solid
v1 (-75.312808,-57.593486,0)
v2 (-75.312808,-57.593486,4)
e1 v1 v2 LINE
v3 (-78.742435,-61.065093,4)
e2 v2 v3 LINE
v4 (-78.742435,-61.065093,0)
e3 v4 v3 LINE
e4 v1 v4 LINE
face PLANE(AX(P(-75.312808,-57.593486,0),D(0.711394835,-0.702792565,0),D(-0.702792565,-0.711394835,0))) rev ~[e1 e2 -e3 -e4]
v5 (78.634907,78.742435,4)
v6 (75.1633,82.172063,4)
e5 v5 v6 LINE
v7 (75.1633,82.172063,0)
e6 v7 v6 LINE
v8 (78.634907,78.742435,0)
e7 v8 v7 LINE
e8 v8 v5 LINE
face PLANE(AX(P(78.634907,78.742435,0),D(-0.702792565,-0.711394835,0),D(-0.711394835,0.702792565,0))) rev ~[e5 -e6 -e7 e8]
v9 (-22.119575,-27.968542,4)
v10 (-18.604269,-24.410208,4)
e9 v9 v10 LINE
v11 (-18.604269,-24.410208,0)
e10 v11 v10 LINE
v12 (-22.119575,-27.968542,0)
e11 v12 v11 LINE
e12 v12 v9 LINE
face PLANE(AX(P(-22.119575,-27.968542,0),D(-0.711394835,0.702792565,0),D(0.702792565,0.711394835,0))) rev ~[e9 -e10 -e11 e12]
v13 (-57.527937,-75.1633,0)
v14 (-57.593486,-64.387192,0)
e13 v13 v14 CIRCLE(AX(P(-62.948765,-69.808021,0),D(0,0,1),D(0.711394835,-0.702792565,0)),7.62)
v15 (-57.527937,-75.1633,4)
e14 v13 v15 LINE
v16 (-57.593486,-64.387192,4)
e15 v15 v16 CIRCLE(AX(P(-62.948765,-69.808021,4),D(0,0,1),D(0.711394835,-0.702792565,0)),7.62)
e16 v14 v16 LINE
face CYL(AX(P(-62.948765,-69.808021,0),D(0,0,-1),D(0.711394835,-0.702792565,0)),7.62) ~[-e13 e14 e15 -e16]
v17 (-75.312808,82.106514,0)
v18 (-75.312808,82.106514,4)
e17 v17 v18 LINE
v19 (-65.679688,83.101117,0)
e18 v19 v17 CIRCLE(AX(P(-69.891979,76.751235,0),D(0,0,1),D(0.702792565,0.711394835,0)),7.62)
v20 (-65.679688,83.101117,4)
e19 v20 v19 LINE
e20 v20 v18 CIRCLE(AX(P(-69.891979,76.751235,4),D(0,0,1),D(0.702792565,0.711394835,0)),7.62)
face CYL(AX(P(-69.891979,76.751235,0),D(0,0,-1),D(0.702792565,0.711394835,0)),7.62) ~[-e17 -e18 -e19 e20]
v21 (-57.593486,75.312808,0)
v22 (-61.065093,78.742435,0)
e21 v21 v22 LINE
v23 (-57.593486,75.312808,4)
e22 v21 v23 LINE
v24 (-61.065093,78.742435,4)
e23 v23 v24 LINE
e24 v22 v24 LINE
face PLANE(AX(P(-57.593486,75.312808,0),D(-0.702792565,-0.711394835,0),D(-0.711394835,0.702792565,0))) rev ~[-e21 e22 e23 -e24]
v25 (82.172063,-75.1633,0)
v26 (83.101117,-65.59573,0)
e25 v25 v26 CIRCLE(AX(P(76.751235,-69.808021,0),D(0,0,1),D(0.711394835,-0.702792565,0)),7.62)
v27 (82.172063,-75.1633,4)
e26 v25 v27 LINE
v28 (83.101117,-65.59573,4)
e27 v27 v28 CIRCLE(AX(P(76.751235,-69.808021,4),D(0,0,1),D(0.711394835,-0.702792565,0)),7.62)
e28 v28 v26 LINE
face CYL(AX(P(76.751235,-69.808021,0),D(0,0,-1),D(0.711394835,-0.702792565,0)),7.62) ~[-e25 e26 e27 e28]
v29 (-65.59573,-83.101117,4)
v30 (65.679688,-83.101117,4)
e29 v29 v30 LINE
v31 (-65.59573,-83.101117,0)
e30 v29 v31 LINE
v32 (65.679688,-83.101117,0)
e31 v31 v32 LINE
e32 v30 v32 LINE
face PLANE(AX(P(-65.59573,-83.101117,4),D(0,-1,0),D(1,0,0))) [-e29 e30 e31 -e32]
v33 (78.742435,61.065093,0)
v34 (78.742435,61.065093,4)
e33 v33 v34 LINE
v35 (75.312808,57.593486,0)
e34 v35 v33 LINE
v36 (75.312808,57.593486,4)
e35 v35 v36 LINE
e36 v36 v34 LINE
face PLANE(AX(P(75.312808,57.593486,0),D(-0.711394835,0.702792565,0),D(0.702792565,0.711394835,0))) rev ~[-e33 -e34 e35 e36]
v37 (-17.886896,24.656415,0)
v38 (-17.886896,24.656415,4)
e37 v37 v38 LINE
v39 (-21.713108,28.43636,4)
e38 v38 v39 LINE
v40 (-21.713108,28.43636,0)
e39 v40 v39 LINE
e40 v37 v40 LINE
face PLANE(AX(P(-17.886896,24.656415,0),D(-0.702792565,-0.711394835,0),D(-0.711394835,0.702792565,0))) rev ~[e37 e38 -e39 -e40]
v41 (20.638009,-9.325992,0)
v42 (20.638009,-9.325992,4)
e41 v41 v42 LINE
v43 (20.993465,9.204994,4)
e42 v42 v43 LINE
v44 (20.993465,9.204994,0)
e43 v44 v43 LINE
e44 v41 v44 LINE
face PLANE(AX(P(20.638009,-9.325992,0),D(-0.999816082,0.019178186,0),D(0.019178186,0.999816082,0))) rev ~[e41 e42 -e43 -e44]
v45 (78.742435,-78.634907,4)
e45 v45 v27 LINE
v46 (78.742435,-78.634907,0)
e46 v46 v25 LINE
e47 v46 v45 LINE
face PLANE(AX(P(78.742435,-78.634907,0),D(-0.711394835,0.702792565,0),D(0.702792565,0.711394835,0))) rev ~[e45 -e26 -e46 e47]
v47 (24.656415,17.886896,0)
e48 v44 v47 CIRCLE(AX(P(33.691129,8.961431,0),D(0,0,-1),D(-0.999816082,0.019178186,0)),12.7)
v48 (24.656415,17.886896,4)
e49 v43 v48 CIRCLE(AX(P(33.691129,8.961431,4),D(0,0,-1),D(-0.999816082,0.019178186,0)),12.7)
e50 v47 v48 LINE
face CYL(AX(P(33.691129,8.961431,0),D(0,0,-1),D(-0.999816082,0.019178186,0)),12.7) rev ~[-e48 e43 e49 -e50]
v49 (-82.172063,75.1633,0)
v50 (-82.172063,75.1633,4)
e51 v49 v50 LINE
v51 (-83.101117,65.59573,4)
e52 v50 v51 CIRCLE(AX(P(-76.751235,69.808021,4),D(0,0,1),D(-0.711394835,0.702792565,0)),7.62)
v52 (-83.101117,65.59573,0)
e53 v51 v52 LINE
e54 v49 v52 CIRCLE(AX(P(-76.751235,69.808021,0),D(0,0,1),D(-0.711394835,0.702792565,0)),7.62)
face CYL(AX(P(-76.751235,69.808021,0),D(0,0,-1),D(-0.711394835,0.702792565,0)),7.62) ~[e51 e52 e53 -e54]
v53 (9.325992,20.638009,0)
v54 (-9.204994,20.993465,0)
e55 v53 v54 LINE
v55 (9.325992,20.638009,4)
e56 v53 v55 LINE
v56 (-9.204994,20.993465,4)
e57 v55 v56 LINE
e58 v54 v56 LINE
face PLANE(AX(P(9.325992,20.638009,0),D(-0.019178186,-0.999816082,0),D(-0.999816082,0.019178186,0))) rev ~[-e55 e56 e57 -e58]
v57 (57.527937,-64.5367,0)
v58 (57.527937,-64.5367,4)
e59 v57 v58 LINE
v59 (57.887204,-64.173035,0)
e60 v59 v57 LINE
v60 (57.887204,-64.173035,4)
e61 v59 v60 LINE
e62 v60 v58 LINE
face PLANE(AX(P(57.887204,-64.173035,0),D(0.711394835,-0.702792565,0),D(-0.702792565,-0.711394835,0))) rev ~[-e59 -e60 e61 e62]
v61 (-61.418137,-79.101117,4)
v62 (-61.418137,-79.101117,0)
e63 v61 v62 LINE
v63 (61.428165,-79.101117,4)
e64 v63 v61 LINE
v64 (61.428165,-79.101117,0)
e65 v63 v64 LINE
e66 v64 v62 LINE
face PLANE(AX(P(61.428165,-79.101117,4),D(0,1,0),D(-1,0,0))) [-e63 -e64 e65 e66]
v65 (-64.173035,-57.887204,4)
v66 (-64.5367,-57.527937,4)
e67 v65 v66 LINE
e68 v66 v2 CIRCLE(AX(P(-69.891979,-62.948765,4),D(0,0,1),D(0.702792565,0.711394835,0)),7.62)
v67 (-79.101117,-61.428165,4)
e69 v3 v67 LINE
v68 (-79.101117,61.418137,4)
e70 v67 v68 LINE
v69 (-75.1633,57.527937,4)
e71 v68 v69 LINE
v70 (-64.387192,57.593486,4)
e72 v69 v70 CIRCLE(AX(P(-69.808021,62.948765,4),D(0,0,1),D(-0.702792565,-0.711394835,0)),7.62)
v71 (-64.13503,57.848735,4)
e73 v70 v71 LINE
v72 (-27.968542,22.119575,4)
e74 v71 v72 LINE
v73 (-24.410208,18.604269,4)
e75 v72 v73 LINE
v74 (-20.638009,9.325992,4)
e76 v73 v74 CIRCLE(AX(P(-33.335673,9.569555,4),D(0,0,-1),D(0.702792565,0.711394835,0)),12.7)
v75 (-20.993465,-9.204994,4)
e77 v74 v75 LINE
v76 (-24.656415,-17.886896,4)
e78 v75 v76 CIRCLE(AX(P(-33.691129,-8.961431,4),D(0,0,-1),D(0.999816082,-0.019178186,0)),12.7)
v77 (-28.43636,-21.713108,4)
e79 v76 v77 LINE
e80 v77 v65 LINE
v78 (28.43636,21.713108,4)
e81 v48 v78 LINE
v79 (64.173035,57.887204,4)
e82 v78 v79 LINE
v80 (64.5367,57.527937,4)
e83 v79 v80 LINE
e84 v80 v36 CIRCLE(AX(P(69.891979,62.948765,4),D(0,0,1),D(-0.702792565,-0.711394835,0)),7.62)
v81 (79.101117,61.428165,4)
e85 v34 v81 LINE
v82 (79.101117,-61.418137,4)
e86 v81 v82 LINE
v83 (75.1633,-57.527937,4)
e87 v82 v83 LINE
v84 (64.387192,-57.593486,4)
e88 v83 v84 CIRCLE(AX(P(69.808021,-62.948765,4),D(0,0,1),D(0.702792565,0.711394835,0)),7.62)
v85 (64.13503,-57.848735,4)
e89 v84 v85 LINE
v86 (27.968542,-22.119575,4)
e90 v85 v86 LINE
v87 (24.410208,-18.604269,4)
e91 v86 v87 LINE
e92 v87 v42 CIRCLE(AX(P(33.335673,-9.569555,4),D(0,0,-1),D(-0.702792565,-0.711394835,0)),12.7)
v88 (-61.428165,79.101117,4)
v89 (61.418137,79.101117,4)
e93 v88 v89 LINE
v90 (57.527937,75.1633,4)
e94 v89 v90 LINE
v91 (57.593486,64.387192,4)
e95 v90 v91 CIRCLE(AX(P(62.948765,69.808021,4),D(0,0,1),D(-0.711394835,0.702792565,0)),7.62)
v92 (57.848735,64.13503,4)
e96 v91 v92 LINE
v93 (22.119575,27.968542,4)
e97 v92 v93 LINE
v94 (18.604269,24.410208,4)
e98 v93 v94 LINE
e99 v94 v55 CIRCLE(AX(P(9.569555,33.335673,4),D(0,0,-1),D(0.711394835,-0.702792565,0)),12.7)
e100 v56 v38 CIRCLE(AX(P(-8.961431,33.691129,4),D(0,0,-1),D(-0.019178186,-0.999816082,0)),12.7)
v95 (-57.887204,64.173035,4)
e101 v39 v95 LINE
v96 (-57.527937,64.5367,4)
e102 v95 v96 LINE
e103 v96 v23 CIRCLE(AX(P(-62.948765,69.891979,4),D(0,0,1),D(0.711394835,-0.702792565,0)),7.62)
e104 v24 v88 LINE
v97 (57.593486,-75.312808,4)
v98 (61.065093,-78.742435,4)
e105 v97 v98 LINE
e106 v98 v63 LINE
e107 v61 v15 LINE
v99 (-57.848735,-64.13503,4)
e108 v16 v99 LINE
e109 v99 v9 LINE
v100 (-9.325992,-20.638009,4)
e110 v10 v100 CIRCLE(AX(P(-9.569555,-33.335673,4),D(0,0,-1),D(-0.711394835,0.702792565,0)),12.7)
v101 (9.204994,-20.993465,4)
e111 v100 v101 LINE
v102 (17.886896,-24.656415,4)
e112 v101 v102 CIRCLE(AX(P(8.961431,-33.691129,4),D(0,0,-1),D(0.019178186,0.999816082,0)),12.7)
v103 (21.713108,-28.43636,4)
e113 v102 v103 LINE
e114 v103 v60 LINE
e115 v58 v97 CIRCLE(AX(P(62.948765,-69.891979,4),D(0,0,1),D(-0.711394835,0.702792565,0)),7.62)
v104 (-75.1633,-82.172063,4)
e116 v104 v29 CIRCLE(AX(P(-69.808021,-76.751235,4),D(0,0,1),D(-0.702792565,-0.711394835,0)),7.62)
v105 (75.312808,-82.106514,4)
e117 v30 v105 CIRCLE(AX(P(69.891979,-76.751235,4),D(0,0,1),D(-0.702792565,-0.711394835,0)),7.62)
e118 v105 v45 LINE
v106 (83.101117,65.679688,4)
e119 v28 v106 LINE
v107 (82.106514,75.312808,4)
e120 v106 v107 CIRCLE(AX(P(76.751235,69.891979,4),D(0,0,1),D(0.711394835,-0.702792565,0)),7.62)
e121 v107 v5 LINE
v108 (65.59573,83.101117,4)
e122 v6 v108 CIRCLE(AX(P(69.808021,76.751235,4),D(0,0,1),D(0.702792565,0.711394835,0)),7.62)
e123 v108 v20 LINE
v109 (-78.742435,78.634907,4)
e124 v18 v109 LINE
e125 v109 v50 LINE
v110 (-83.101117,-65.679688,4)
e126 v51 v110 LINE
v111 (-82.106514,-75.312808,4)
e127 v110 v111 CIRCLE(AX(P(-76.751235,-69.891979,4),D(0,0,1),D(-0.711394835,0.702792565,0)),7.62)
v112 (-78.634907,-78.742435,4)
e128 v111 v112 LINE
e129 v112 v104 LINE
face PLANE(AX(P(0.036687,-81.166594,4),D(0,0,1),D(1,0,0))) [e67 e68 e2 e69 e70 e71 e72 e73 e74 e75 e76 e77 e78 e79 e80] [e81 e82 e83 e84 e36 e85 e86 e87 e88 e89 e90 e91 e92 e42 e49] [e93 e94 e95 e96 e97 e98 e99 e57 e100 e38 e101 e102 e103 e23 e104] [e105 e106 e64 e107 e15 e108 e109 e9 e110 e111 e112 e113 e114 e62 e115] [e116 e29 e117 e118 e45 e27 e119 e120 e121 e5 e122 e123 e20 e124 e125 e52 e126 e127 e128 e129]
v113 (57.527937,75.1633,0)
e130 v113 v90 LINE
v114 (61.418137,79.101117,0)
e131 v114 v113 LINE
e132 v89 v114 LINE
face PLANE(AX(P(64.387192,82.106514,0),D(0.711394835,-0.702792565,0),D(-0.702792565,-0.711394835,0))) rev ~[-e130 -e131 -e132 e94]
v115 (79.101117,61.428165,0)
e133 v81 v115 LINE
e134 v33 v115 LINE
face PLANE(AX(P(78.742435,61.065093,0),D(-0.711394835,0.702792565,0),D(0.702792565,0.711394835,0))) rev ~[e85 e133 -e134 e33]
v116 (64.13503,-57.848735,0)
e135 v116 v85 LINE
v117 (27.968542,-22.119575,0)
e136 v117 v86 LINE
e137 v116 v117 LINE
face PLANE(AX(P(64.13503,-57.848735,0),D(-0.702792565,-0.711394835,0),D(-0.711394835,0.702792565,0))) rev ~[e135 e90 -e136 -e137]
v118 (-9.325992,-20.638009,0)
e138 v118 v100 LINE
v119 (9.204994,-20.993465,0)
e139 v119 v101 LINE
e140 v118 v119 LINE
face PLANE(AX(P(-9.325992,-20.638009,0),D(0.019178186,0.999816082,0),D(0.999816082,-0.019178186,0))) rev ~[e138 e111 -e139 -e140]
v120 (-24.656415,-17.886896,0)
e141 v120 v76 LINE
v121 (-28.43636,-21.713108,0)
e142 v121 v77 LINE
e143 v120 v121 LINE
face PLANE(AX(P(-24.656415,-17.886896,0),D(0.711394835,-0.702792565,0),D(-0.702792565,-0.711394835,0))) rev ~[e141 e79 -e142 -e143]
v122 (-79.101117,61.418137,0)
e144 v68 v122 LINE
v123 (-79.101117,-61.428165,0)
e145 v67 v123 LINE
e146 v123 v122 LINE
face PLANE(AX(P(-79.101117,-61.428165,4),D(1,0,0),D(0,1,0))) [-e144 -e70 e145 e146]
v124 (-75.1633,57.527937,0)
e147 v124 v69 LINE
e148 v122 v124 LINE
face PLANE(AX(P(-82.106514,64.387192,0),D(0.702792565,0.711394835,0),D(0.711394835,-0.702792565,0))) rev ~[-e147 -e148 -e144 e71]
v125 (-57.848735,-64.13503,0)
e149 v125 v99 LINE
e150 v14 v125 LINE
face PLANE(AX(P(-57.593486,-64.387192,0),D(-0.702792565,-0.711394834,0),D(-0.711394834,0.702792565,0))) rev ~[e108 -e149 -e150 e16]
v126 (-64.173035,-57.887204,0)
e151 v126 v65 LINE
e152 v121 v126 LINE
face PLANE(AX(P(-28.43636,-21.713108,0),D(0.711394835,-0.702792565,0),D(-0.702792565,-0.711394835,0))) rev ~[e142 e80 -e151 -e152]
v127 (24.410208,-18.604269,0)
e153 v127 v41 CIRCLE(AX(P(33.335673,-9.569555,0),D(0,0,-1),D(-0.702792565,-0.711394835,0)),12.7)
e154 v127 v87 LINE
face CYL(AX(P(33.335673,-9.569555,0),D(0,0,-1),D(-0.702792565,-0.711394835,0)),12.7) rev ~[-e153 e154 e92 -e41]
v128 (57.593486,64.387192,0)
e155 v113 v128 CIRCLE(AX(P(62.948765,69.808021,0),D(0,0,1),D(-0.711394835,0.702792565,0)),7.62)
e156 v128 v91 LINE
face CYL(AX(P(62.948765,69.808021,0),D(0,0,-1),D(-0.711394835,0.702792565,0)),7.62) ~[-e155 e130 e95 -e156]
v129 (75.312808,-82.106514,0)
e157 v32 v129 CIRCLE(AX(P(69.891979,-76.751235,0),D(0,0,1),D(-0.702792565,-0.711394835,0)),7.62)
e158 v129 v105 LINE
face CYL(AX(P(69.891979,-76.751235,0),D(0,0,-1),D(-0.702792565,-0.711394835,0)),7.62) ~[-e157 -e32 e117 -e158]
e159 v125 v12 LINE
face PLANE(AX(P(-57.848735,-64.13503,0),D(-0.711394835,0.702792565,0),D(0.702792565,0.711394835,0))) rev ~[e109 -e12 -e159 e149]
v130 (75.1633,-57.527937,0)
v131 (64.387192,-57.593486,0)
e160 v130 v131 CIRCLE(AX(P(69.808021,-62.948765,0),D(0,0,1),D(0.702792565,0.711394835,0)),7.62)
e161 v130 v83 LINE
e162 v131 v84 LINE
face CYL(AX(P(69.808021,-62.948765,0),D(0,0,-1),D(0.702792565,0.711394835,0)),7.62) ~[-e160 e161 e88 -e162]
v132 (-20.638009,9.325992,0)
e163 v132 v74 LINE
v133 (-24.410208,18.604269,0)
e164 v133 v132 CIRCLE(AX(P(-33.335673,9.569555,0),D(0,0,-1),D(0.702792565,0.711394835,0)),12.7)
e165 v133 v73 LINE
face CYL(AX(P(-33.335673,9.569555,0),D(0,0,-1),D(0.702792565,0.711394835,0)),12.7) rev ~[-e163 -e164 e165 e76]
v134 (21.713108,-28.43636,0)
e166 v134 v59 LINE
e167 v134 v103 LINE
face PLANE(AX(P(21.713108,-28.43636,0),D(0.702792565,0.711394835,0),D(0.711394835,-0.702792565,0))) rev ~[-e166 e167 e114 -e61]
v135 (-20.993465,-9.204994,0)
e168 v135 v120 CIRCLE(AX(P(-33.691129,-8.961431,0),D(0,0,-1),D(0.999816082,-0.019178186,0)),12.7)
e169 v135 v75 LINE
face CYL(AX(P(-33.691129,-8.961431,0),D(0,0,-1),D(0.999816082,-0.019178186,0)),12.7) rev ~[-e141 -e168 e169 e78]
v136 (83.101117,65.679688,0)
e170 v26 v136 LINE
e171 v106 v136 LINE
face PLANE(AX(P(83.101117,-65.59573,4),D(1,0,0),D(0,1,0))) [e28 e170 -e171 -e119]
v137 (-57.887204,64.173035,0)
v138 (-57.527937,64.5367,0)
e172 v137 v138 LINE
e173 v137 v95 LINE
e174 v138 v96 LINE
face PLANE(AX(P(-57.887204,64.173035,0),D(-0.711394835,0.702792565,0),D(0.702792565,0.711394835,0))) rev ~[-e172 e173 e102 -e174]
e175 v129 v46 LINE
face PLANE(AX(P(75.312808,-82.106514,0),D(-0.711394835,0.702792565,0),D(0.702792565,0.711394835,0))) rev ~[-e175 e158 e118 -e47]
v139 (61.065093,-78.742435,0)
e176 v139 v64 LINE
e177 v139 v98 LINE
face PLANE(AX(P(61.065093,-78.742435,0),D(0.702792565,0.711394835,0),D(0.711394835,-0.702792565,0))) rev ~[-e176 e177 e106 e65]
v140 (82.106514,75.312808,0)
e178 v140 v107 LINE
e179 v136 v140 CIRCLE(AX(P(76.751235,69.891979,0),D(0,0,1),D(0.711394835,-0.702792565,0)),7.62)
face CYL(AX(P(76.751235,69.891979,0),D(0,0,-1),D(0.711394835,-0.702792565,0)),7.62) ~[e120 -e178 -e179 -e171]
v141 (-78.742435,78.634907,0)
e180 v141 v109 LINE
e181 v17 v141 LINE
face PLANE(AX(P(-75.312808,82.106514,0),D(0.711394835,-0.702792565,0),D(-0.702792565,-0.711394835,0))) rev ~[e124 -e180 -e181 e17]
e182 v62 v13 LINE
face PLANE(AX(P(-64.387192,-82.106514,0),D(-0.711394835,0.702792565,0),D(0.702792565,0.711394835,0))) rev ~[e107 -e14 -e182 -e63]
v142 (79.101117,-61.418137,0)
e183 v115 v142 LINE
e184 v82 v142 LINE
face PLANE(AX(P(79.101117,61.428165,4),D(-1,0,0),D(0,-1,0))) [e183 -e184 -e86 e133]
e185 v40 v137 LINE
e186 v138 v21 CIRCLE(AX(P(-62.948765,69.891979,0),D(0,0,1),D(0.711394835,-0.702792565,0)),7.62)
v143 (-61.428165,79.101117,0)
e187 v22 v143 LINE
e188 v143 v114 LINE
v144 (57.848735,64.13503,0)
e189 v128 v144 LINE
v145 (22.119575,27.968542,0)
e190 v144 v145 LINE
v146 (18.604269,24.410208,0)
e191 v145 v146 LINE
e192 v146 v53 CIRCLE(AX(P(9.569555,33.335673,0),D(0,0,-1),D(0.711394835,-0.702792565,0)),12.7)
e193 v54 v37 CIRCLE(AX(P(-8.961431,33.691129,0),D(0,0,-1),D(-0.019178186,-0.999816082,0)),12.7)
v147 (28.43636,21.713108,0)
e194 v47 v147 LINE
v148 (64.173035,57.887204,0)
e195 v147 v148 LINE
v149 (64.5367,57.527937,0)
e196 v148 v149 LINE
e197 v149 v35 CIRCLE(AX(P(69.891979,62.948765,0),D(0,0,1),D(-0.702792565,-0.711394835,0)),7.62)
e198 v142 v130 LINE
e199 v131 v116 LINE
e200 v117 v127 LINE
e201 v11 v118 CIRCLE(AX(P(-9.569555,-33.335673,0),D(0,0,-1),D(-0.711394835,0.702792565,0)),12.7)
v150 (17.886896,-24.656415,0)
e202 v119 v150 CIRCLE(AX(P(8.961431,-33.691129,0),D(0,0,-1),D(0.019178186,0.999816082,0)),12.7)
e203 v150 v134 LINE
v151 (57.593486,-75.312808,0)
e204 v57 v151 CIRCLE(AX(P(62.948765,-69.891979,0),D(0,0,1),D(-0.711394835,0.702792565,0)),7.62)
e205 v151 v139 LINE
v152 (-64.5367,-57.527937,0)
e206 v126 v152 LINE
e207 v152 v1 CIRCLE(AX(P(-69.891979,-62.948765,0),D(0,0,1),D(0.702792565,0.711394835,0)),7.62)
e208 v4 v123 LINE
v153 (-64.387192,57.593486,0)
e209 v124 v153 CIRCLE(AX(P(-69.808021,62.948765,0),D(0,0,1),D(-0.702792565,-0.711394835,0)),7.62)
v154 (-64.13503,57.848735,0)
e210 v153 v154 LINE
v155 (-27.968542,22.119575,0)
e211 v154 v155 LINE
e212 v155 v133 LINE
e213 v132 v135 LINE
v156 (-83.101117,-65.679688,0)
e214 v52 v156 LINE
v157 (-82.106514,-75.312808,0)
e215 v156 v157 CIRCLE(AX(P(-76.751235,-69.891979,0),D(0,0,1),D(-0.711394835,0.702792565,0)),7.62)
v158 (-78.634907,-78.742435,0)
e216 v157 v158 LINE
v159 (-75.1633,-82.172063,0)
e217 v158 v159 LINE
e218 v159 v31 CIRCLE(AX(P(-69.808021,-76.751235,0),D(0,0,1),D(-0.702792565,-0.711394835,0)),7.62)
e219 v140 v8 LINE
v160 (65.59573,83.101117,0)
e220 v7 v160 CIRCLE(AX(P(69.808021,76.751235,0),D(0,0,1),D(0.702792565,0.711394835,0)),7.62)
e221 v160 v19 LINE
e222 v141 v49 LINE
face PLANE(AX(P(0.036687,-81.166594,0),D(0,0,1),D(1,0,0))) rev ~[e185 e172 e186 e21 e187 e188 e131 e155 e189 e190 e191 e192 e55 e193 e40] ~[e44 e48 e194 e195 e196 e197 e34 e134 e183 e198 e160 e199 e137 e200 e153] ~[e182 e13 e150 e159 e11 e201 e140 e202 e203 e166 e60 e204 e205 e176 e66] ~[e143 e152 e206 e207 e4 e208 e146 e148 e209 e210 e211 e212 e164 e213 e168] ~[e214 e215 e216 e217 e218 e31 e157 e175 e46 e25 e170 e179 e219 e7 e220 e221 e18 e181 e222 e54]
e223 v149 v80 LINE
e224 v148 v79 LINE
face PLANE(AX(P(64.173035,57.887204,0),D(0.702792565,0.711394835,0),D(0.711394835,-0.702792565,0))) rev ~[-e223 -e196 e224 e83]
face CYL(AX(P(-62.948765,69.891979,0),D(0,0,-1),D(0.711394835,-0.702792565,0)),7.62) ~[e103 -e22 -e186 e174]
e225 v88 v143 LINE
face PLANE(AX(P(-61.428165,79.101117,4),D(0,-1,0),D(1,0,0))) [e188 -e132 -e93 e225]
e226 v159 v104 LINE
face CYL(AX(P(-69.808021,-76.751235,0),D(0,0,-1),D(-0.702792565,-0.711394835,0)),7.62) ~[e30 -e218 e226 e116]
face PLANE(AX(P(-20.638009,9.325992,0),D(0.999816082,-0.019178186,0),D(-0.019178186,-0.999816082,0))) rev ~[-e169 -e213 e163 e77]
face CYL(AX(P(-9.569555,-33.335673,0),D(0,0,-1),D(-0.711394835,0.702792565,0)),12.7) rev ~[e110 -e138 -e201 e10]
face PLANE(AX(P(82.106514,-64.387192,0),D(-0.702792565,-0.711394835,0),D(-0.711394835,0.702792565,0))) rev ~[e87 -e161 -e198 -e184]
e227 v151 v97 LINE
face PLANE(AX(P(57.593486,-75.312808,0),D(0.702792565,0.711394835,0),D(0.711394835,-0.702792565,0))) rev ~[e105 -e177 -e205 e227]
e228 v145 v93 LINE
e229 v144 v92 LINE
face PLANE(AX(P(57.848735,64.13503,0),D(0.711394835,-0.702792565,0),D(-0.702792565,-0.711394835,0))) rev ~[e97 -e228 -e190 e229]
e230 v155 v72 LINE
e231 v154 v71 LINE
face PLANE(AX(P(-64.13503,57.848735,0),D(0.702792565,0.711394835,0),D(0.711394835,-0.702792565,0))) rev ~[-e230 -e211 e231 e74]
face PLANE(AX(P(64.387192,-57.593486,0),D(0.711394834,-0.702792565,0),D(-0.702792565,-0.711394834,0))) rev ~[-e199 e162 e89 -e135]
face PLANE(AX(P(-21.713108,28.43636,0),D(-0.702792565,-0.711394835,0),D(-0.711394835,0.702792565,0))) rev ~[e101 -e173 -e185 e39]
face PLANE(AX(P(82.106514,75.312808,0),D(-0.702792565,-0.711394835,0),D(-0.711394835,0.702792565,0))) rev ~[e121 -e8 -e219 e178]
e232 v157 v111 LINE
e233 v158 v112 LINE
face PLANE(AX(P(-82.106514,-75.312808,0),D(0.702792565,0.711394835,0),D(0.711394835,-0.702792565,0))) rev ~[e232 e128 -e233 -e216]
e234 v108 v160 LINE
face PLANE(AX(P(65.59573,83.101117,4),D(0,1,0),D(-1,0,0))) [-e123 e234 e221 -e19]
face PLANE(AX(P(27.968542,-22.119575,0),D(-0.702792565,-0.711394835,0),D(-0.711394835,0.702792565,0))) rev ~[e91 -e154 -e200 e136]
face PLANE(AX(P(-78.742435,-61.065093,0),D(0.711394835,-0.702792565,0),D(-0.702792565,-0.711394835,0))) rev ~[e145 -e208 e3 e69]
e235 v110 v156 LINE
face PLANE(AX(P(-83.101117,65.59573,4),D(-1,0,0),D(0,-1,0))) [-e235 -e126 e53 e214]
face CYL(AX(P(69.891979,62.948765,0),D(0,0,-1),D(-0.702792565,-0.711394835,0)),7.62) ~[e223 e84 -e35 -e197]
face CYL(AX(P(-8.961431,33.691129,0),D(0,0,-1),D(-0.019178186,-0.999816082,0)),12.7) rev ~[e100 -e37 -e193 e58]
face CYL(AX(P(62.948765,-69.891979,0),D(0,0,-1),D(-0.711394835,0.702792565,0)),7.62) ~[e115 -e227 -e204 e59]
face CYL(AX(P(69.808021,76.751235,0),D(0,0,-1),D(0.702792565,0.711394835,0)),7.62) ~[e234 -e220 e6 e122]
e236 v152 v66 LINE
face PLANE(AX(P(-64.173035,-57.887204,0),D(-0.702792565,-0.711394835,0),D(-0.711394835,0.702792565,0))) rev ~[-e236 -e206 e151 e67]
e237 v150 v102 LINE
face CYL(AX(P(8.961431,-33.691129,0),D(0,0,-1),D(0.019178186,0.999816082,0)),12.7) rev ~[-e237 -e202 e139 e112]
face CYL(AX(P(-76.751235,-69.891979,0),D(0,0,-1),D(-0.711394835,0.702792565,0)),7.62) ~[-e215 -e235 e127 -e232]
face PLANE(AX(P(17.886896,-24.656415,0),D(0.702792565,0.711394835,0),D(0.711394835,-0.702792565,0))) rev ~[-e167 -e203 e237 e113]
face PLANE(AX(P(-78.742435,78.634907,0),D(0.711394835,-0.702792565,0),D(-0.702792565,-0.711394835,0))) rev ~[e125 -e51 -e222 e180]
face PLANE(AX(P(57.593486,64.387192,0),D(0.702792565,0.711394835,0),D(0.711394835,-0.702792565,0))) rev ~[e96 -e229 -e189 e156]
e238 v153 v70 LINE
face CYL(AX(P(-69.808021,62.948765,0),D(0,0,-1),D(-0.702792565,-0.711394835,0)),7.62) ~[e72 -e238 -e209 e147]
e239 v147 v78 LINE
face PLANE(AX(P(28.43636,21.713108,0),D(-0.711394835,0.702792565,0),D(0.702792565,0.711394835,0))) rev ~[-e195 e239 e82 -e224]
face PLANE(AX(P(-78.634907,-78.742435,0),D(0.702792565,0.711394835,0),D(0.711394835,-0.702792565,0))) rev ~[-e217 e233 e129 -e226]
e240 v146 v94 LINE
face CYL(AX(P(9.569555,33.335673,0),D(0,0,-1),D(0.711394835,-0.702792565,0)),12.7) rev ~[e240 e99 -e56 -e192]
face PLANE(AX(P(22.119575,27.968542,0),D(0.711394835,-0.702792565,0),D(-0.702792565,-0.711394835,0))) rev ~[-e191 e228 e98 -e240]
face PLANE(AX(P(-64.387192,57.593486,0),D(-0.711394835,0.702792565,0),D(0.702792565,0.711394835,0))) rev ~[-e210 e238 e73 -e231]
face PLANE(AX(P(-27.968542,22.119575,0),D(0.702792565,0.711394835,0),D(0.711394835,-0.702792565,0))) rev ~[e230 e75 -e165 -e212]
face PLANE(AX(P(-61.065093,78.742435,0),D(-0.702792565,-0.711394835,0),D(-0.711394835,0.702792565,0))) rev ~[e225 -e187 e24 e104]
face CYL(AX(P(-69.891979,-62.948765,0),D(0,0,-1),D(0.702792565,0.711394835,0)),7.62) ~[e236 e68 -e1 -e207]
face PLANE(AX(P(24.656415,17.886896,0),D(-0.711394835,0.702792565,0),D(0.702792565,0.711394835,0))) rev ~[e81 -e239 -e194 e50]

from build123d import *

# Parameters (mm, degrees)
F1_DEPTH = 4
F3_DEPTH = 4


with BuildPart() as f1:
    # F0 (on Top) → F1 (new body)
    with BuildSketch(Plane.XY):
        with BuildLine():
            Line((-64.135030253, 57.8487346722), (-60.9918824626, 60.9918824626))
            Line((-60.9918824626, 60.9918824626), (-57.8872043507, 64.1730347516))
            Line((-57.8872043507, 64.1730347516), (-57.5279368508, 64.536699731))
            ThreePointArc((-57.5279368508, 64.536699731), (-55.3289064598, 69.9383294266), (-57.5934861455, 75.3128077153))
            Line((-57.5934861455, 75.3128077153), (-61.0650929383, 78.7424354322))
            Line((-61.0650929383, 78.7424354322), (-64.536699731, 82.1720631491))
            ThreePointArc((-64.536699731, 82.1720631491), (-69.9383294266, 84.3710935402), (-75.3128077153, 82.1065138545))
            Line((-75.3128077153, 82.1065138545), (-78.7424354322, 78.6349070617))
            Line((-78.7424354322, 78.6349070617), (-82.1720631491, 75.163300269))
            ThreePointArc((-82.1720631491, 75.163300269), (-84.3710935402, 69.7616705734), (-82.1065138545, 64.3871922846))
            Line((-82.1065138545, 64.3871922846), (-75.163300269, 57.5279368508))
            ThreePointArc((-75.163300269, 57.5279368508), (-69.7616705734, 55.3289064598), (-64.3871922846, 57.5934861455))
            Line((-64.3871922846, 57.5934861455), (-64.135030253, 57.8487346722))
        make_face()
        with BuildLine():
            Line((-60.9918824626, 60.9918824626), (-24.9487193947, 24.9487193947))
            ThreePointArc((-24.9487193947, 24.9487193947), (-23.2982405477, 26.6622275187), (-21.7131078047, 28.4363596169))
            Line((-21.7131078047, 28.4363596169), (-57.8872043507, 64.1730347516))
            Line((-57.8872043507, 64.1730347516), (-60.9918824626, 60.9918824626))
        make_face()
        with BuildLine():
            ThreePointArc((-27.9685415263, 22.1195753621), (-26.4355788417, 23.5095421312), (-24.9487193947, 24.9487193947))
            Line((-24.9487193947, 24.9487193947), (-60.9918824626, 60.9918824626))
            Line((-60.9918824626, 60.9918824626), (-64.135030253, 57.8487346722))
            Line((-64.135030253, 57.8487346722), (-27.9685415263, 22.1195753621))
        make_face()
        with BuildLine():
            Line((-24.9487193947, 24.9487193947), (0, 0))
            Line((0, 0), (24.9487193947, 24.9487193947))
            ThreePointArc((24.9487193947, 24.9487193947), (23.5095421312, 26.4355788417), (22.1195753621, 27.9685415263))
            Line((22.1195753621, 27.9685415263), (18.6042693789, 24.4102077544))
            ThreePointArc((18.6042693789, 24.4102077544), (14.3526979396, 21.5708297932), (9.3259920152, 20.6380090919))
            Line((9.3259920152, 20.6380090919), (-9.2049935755, 20.9934651587))
            ThreePointArc((-9.2049935755, 20.9934651587), (-13.8982384325, 21.9899359298), (-17.8868961856, 24.6564149968))
            Line((-17.8868961856, 24.6564149968), (-21.7131078047, 28.4363596169))
            ThreePointArc((-21.7131078047, 28.4363596169), (-23.2982405477, 26.6622275187), (-24.9487193947, 24.9487193947))
        make_face()
        with BuildLine():
            Line((-24.6564149968, -17.8868961856), (-28.4363596169, -21.7131078047))
            ThreePointArc((-28.4363596169, -21.7131078047), (-26.6622275187, -23.2982405478), (-24.9487193947, -24.9487193947))
            Line((-24.9487193947, -24.9487193947), (0, 0))
            Line((0, 0), (-24.9487193947, 24.9487193947))
            ThreePointArc((-24.9487193947, 24.9487193947), (-26.4355788417, 23.5095421312), (-27.9685415263, 22.1195753621))
            Line((-27.9685415263, 22.1195753621), (-24.4102077544, 18.6042693789))
            ThreePointArc((-24.4102077544, 18.6042693789), (-21.5708297932, 14.3526979396), (-20.6380090919, 9.3259920152))
            Line((-20.6380090919, 9.3259920152), (-20.9934651587, -9.2049935755))
            ThreePointArc((-20.9934651587, -9.2049935755), (-21.9899359298, -13.8982384325), (-24.6564149968, -17.8868961856))
        make_face()
        with BuildLine():
            ThreePointArc((-24.9487193947, -24.9487193947), (-23.5095421312, -26.4355788418), (-22.1195753621, -27.9685415263))
            Line((-22.1195753621, -27.9685415263), (-18.6042693789, -24.4102077545))
            ThreePointArc((-18.6042693789, -24.4102077545), (-14.3526979396, -21.5708297932), (-9.3259920152, -20.6380090919))
            Line((-9.3259920152, -20.6380090919), (9.2049935755, -20.9934651587))
            ThreePointArc((9.2049935755, -20.9934651587), (13.8982384325, -21.9899359298), (17.8868961856, -24.6564149968))
            Line((17.8868961856, -24.6564149968), (21.7131078047, -28.4363596169))
            ThreePointArc((21.7131078047, -28.4363596169), (23.2982405477, -26.6622275187), (24.9487193947, -24.9487193947))
            Line((24.9487193947, -24.9487193947), (0, 0))
            Line((0, 0), (-24.9487193947, -24.9487193947))
        make_face()
        with BuildLine():
            Line((24.9487193947, 24.9487193947), (0, 0))
            Line((0, 0), (24.9487193947, -24.9487193947))
            ThreePointArc((24.9487193947, -24.9487193947), (26.4355788417, -23.5095421312), (27.9685415263, -22.1195753621))
            Line((27.9685415263, -22.1195753621), (24.4102077545, -18.6042693789))
            ThreePointArc((24.4102077545, -18.6042693789), (21.5708297932, -14.3526979396), (20.6380090919, -9.3259920152))
            Line((20.6380090919, -9.3259920152), (20.9934651587, 9.2049935755))
            ThreePointArc((20.9934651587, 9.2049935755), (21.9899359298, 13.8982384325), (24.6564149968, 17.8868961856))
            Line((24.6564149968, 17.8868961856), (28.4363596169, 21.7131078047))
            ThreePointArc((28.4363596169, 21.7131078047), (26.6622275187, 23.2982405477), (24.9487193947, 24.9487193947))
        make_face()
        with BuildLine():
            Line((60.9918824626, 60.9918824626), (24.9487193947, 24.9487193947))
            ThreePointArc((24.9487193947, 24.9487193947), (26.6622275187, 23.2982405477), (28.4363596169, 21.7131078047))
            Line((28.4363596169, 21.7131078047), (64.1730347516, 57.8872043507))
            Line((64.1730347516, 57.8872043507), (60.9918824626, 60.9918824626))
        make_face()
        with BuildLine():
            ThreePointArc((22.1195753621, 27.9685415263), (23.5095421312, 26.4355788417), (24.9487193947, 24.9487193947))
            Line((24.9487193947, 24.9487193947), (60.9918824626, 60.9918824626))
            Line((60.9918824626, 60.9918824626), (57.8487346722, 64.135030253))
            Line((57.8487346722, 64.135030253), (22.1195753621, 27.9685415263))
        make_face()
        with BuildLine():
            Line((57.8487346722, 64.135030253), (60.9918824626, 60.9918824626))
            Line((60.9918824626, 60.9918824626), (64.1730347516, 57.8872043507))
            Line((64.1730347516, 57.8872043507), (64.536699731, 57.5279368508))
            ThreePointArc((64.536699731, 57.5279368508), (69.9383294266, 55.3289064598), (75.3128077154, 57.5934861455))
            Line((75.3128077154, 57.5934861455), (78.7424354323, 61.0650929383))
            Line((78.7424354323, 61.0650929383), (82.1720631492, 64.536699731))
            ThreePointArc((82.1720631492, 64.536699731), (84.3710935402, 69.9383294266), (82.1065138545, 75.3128077153))
            Line((82.1065138545, 75.3128077153), (78.6349070617, 78.7424354322))
            Line((78.6349070617, 78.7424354322), (75.163300269, 82.1720631491))
            ThreePointArc((75.163300269, 82.1720631491), (69.7616705734, 84.3710935402), (64.3871922846, 82.1065138545))
            Line((64.3871922846, 82.1065138545), (57.5279368508, 75.163300269))
            ThreePointArc((57.5279368508, 75.163300269), (55.3289064598, 69.7616705734), (57.5934861455, 64.3871922846))
            Line((57.5934861455, 64.3871922846), (57.8487346722, 64.135030253))
        make_face()
        with BuildLine():
            Line((64.135030253, -57.8487346722), (60.9918824626, -60.9918824626))
            Line((60.9918824626, -60.9918824626), (57.8872043507, -64.1730347516))
            Line((57.8872043507, -64.1730347516), (57.5279368509, -64.536699731))
            ThreePointArc((57.5279368509, -64.536699731), (55.3289064598, -69.9383294266), (57.5934861455, -75.3128077154))
            Line((57.5934861455, -75.3128077154), (61.0650929383, -78.7424354323))
            Line((61.0650929383, -78.7424354323), (64.536699731, -82.1720631492))
            ThreePointArc((64.536699731, -82.1720631492), (69.9383294266, -84.3710935402), (75.3128077154, -82.1065138545))
            Line((75.3128077154, -82.1065138545), (78.7424354323, -78.6349070617))
            Line((78.7424354323, -78.6349070617), (82.1720631492, -75.163300269))
            ThreePointArc((82.1720631492, -75.163300269), (84.3710935402, -69.7616705734), (82.1065138545, -64.3871922846))
            Line((82.1065138545, -64.3871922846), (75.163300269, -57.5279368508))
            ThreePointArc((75.163300269, -57.5279368508), (69.7616705734, -55.3289064598), (64.3871922847, -57.5934861455))
            Line((64.3871922847, -57.5934861455), (64.135030253, -57.8487346722))
        make_face()
        with BuildLine():
            ThreePointArc((27.9685415263, -22.1195753621), (26.4355788417, -23.5095421312), (24.9487193947, -24.9487193947))
            Line((24.9487193947, -24.9487193947), (60.9918824626, -60.9918824626))
            Line((60.9918824626, -60.9918824626), (64.135030253, -57.8487346722))
            Line((64.135030253, -57.8487346722), (27.9685415263, -22.1195753621))
        make_face()
        with BuildLine():
            Line((60.9918824626, -60.9918824626), (24.9487193947, -24.9487193947))
            ThreePointArc((24.9487193947, -24.9487193947), (23.2982405477, -26.6622275187), (21.7131078047, -28.4363596169))
            Line((21.7131078047, -28.4363596169), (57.8872043507, -64.1730347516))
            Line((57.8872043507, -64.1730347516), (60.9918824626, -60.9918824626))
        make_face()
        with BuildLine():
            Line((-57.8487346722, -64.135030253), (-22.1195753621, -27.9685415263))
            ThreePointArc((-22.1195753621, -27.9685415263), (-23.5095421312, -26.4355788418), (-24.9487193947, -24.9487193947))
            Line((-24.9487193947, -24.9487193947), (-60.9918824626, -60.9918824626))
            Line((-60.9918824626, -60.9918824626), (-57.8487346722, -64.135030253))
        make_face()
        with BuildLine():
            ThreePointArc((-24.9487193947, -24.9487193947), (-26.6622275187, -23.2982405478), (-28.4363596169, -21.7131078047))
            Line((-28.4363596169, -21.7131078047), (-64.1730347516, -57.8872043507))
            Line((-64.1730347516, -57.8872043507), (-60.9918824626, -60.9918824626))
            Line((-60.9918824626, -60.9918824626), (-24.9487193947, -24.9487193947))
        make_face()
        with BuildLine():
            Line((-57.5934861455, -64.3871922847), (-57.8487346722, -64.135030253))
            Line((-57.8487346722, -64.135030253), (-60.9918824626, -60.9918824626))
            Line((-60.9918824626, -60.9918824626), (-64.1730347516, -57.8872043507))
            Line((-64.1730347516, -57.8872043507), (-64.536699731, -57.5279368509))
            ThreePointArc((-64.536699731, -57.5279368509), (-69.9383294266, -55.3289064598), (-75.3128077153, -57.5934861455))
            Line((-75.3128077153, -57.5934861455), (-78.7424354322, -61.0650929383))
            Line((-78.7424354322, -61.0650929383), (-82.1720631491, -64.536699731))
            ThreePointArc((-82.1720631491, -64.536699731), (-84.3710935402, -69.9383294266), (-82.1065138545, -75.3128077154))
            Line((-82.1065138545, -75.3128077154), (-78.6349070617, -78.7424354323))
            Line((-78.6349070617, -78.7424354323), (-75.163300269, -82.1720631492))
            ThreePointArc((-75.163300269, -82.1720631492), (-69.7616705734, -84.3710935402), (-64.3871922846, -82.1065138545))
            Line((-64.3871922846, -82.1065138545), (-57.5279368508, -75.163300269))
            ThreePointArc((-57.5279368508, -75.163300269), (-55.3289064598, -69.7616705734), (-57.5934861455, -64.3871922847))
        make_face()
    extrude(amount=F1_DEPTH)

    # F2 (on face) → F3 (join)
    with BuildSketch(Plane.XY.offset(4)):
        with BuildLine():
            ThreePointArc((-64.3871922846, -82.1065138545), (-64.9658566006, -82.634927624), (-65.5957303462, -83.1011170351))
            Line((-65.5957303462, -83.1011170351), (65.6796884979, -83.1011170351))
            ThreePointArc((65.6796884979, -83.1011170351), (65.0856932086, -82.6642723213), (64.536699731, -82.1720631492))
            Line((64.536699731, -82.1720631492), (61.4281648492, -79.1011170351))
            Line((61.4281648492, -79.1011170351), (-61.4181370755, -79.1011170351))
            Line((-61.4181370755, -79.1011170351), (-64.3871922846, -82.1065138545))
        make_face()
        with BuildLine():
            ThreePointArc((-75.163300269, -82.1720631492), (-70.5444929949, -84.335561038), (-65.5957303462, -83.1011170351))
            ThreePointArc((-65.5957303462, -83.1011170351), (-64.9658566006, -82.634927624), (-64.3871922846, -82.1065138545))
            Line((-64.3871922846, -82.1065138545), (-61.4181370755, -79.1011170351))
            Line((-61.4181370755, -79.1011170351), (-57.5279368508, -75.163300269))
            ThreePointArc((-57.5279368508, -75.163300269), (-55.3289064598, -69.7616705734), (-57.5934861455, -64.3871922847))
            Line((-57.5934861455, -64.3871922847), (-57.8487346722, -64.135030253))
            Line((-57.8487346722, -64.135030253), (-18.6042693789, -24.4102077545))
            ThreePointArc((-18.6042693789, -24.4102077545), (-14.3526979396, -21.5708297932), (-9.3259920152, -20.6380090919))
            Line((-9.3259920152, -20.6380090919), (9.2049935755, -20.9934651587))
            ThreePointArc((9.2049935755, -20.9934651587), (13.8982384325, -21.9899359298), (17.8868961856, -24.6564149968))
            Line((17.8868961856, -24.6564149968), (57.8872043507, -64.1730347516))
            Line((57.8872043507, -64.1730347516), (57.5279368509, -64.536699731))
            ThreePointArc((57.5279368509, -64.536699731), (55.3289064598, -69.9383294266), (57.5934861455, -75.3128077154))
            Line((57.5934861455, -75.3128077154), (61.4281648492, -79.1011170351))
            Line((61.4281648492, -79.1011170351), (64.536699731, -82.1720631492))
            ThreePointArc((64.536699731, -82.1720631492), (65.0856932086, -82.6642723213), (65.6796884979, -83.1011170351))
            ThreePointArc((65.6796884979, -83.1011170351), (70.6745708809, -84.3309409727), (75.3128077154, -82.1065138545))
            Line((75.3128077154, -82.1065138545), (82.1720631492, -75.163300269))
            ThreePointArc((82.1720631492, -75.163300269), (84.335561038, -70.5444929949), (83.1011170351, -65.5957303462))
            ThreePointArc((83.1011170351, -65.5957303462), (82.634927624, -64.9658566006), (82.1065138545, -64.3871922846))
            Line((82.1065138545, -64.3871922846), (79.1011170351, -61.4181370755))
            Line((79.1011170351, -61.4181370755), (75.163300269, -57.5279368508))
            ThreePointArc((75.163300269, -57.5279368508), (69.7616705734, -55.3289064598), (64.3871922847, -57.5934861455))
            Line((64.3871922847, -57.5934861455), (64.135030253, -57.8487346722))
            Line((64.135030253, -57.8487346722), (24.4102077545, -18.6042693789))
            ThreePointArc((24.4102077545, -18.6042693789), (21.5708297932, -14.3526979396), (20.6380090919, -9.3259920152))
            Line((20.6380090919, -9.3259920152), (20.9934651587, 9.2049935755))
            ThreePointArc((20.9934651587, 9.2049935755), (21.9899359298, 13.8982384325), (24.6564149968, 17.8868961856))
            Line((24.6564149968, 17.8868961856), (64.1730347516, 57.8872043507))
            Line((64.1730347516, 57.8872043507), (64.536699731, 57.5279368508))
            ThreePointArc((64.536699731, 57.5279368508), (69.9383294266, 55.3289064598), (75.3128077154, 57.5934861455))
            Line((75.3128077154, 57.5934861455), (79.1011170351, 61.4281648492))
            Line((79.1011170351, 61.4281648492), (82.1720631492, 64.536699731))
            ThreePointArc((82.1720631492, 64.536699731), (82.6642723213, 65.0856932086), (83.1011170351, 65.6796884979))
            ThreePointArc((83.1011170351, 65.6796884979), (84.3309409727, 70.6745708809), (82.1065138545, 75.3128077153))
            Line((82.1065138545, 75.3128077153), (75.163300269, 82.1720631491))
            ThreePointArc((75.163300269, 82.1720631491), (70.5444929949, 84.335561038), (65.5957303462, 83.1011170351))
            ThreePointArc((65.5957303462, 83.1011170351), (64.9658566006, 82.634927624), (64.3871922846, 82.1065138545))
            Line((64.3871922846, 82.1065138545), (61.4181370755, 79.1011170351))
            Line((61.4181370755, 79.1011170351), (57.5279368508, 75.163300269))
            ThreePointArc((57.5279368508, 75.163300269), (55.3289064598, 69.7616705734), (57.5934861455, 64.3871922846))
            Line((57.5934861455, 64.3871922846), (57.8487346722, 64.135030253))
            Line((57.8487346722, 64.135030253), (18.6042693789, 24.4102077544))
            ThreePointArc((18.6042693789, 24.4102077544), (14.3526979396, 21.5708297932), (9.3259920152, 20.6380090919))
            Line((9.3259920152, 20.6380090919), (-9.2049935755, 20.9934651587))
            ThreePointArc((-9.2049935755, 20.9934651587), (-13.8982384325, 21.9899359298), (-17.8868961856, 24.6564149968))
            Line((-17.8868961856, 24.6564149968), (-57.8872043507, 64.1730347516))
            Line((-57.8872043507, 64.1730347516), (-57.5279368508, 64.536699731))
            ThreePointArc((-57.5279368508, 64.536699731), (-55.3289064598, 69.9383294266), (-57.5934861455, 75.3128077153))
            Line((-57.5934861455, 75.3128077153), (-61.4281648492, 79.1011170351))
            Line((-61.4281648492, 79.1011170351), (-64.536699731, 82.1720631491))
            ThreePointArc((-64.536699731, 82.1720631491), (-65.0856932086, 82.6642723213), (-65.6796884979, 83.1011170351))
            ThreePointArc((-65.6796884979, 83.1011170351), (-70.6745708809, 84.3309409727), (-75.3128077153, 82.1065138545))
            Line((-75.3128077153, 82.1065138545), (-82.1720631491, 75.163300269))
            ThreePointArc((-82.1720631491, 75.163300269), (-84.335561038, 70.5444929949), (-83.1011170351, 65.5957303462))
            ThreePointArc((-83.1011170351, 65.5957303462), (-82.634927624, 64.9658566006), (-82.1065138545, 64.3871922846))
            Line((-82.1065138545, 64.3871922846), (-79.1011170351, 61.4181370755))
            Line((-79.1011170351, 61.4181370755), (-75.163300269, 57.5279368508))
            ThreePointArc((-75.163300269, 57.5279368508), (-69.7616705734, 55.3289064598), (-64.3871922846, 57.5934861455))
            Line((-64.3871922846, 57.5934861455), (-64.135030253, 57.8487346722))
            Line((-64.135030253, 57.8487346722), (-24.4102077544, 18.6042693789))
            ThreePointArc((-24.4102077544, 18.6042693789), (-21.5708297932, 14.3526979396), (-20.6380090919, 9.3259920152))
            Line((-20.6380090919, 9.3259920152), (-20.9934651587, -9.2049935755))
            ThreePointArc((-20.9934651587, -9.2049935755), (-21.9899359298, -13.8982384325), (-24.6564149968, -17.8868961856))
            Line((-24.6564149968, -17.8868961856), (-64.1730347516, -57.8872043507))
            Line((-64.1730347516, -57.8872043507), (-64.536699731, -57.5279368509))
            ThreePointArc((-64.536699731, -57.5279368509), (-69.9383294266, -55.3289064598), (-75.3128077153, -57.5934861455))
            Line((-75.3128077153, -57.5934861455), (-79.1011170351, -61.4281648492))
            Line((-79.1011170351, -61.4281648492), (-82.1720631491, -64.536699731))
            ThreePointArc((-82.1720631491, -64.536699731), (-82.6642723213, -65.0856932086), (-83.1011170351, -65.6796884979))
            ThreePointArc((-83.1011170351, -65.6796884979), (-84.3309409727, -70.6745708809), (-82.1065138545, -75.3128077154))
            Line((-82.1065138545, -75.3128077154), (-75.163300269, -82.1720631492))
        make_face()
        with BuildLine():
            Line((-83.1011170351, 65.5957303462), (-83.1011170351, -65.6796884979))
            ThreePointArc((-83.1011170351, -65.6796884979), (-82.6642723213, -65.0856932086), (-82.1720631491, -64.536699731))
            Line((-82.1720631491, -64.536699731), (-79.1011170351, -61.4281648492))
            Line((-79.1011170351, -61.4281648492), (-79.1011170351, 61.4181370755))
            Line((-79.1011170351, 61.4181370755), (-82.1065138545, 64.3871922846))
            ThreePointArc((-82.1065138545, 64.3871922846), (-82.634927624, 64.9658566006), (-83.1011170351, 65.5957303462))
        make_face()
        with BuildLine():
            ThreePointArc((82.1065138545, -64.3871922846), (82.634927624, -64.9658566006), (83.1011170351, -65.5957303462))
            Line((83.1011170351, -65.5957303462), (83.1011170351, 65.6796884979))
            ThreePointArc((83.1011170351, 65.6796884979), (82.6642723213, 65.0856932086), (82.1720631492, 64.536699731))
            Line((82.1720631492, 64.536699731), (79.1011170351, 61.4281648492))
            Line((79.1011170351, 61.4281648492), (79.1011170351, -61.4181370755))
            Line((79.1011170351, -61.4181370755), (82.1065138545, -64.3871922846))
        make_face()
        with BuildLine():
            Line((65.5957303462, 83.1011170351), (-65.6796884979, 83.1011170351))
            ThreePointArc((-65.6796884979, 83.1011170351), (-65.0856932086, 82.6642723213), (-64.536699731, 82.1720631491))
            Line((-64.536699731, 82.1720631491), (-61.4281648492, 79.1011170351))
            Line((-61.4281648492, 79.1011170351), (61.4181370755, 79.1011170351))
            Line((61.4181370755, 79.1011170351), (64.3871922846, 82.1065138545))
            ThreePointArc((64.3871922846, 82.1065138545), (64.9658566006, 82.634927624), (65.5957303462, 83.1011170351))
        make_face()
    extrude(amount=-F3_DEPTH)


solid = f1.part
